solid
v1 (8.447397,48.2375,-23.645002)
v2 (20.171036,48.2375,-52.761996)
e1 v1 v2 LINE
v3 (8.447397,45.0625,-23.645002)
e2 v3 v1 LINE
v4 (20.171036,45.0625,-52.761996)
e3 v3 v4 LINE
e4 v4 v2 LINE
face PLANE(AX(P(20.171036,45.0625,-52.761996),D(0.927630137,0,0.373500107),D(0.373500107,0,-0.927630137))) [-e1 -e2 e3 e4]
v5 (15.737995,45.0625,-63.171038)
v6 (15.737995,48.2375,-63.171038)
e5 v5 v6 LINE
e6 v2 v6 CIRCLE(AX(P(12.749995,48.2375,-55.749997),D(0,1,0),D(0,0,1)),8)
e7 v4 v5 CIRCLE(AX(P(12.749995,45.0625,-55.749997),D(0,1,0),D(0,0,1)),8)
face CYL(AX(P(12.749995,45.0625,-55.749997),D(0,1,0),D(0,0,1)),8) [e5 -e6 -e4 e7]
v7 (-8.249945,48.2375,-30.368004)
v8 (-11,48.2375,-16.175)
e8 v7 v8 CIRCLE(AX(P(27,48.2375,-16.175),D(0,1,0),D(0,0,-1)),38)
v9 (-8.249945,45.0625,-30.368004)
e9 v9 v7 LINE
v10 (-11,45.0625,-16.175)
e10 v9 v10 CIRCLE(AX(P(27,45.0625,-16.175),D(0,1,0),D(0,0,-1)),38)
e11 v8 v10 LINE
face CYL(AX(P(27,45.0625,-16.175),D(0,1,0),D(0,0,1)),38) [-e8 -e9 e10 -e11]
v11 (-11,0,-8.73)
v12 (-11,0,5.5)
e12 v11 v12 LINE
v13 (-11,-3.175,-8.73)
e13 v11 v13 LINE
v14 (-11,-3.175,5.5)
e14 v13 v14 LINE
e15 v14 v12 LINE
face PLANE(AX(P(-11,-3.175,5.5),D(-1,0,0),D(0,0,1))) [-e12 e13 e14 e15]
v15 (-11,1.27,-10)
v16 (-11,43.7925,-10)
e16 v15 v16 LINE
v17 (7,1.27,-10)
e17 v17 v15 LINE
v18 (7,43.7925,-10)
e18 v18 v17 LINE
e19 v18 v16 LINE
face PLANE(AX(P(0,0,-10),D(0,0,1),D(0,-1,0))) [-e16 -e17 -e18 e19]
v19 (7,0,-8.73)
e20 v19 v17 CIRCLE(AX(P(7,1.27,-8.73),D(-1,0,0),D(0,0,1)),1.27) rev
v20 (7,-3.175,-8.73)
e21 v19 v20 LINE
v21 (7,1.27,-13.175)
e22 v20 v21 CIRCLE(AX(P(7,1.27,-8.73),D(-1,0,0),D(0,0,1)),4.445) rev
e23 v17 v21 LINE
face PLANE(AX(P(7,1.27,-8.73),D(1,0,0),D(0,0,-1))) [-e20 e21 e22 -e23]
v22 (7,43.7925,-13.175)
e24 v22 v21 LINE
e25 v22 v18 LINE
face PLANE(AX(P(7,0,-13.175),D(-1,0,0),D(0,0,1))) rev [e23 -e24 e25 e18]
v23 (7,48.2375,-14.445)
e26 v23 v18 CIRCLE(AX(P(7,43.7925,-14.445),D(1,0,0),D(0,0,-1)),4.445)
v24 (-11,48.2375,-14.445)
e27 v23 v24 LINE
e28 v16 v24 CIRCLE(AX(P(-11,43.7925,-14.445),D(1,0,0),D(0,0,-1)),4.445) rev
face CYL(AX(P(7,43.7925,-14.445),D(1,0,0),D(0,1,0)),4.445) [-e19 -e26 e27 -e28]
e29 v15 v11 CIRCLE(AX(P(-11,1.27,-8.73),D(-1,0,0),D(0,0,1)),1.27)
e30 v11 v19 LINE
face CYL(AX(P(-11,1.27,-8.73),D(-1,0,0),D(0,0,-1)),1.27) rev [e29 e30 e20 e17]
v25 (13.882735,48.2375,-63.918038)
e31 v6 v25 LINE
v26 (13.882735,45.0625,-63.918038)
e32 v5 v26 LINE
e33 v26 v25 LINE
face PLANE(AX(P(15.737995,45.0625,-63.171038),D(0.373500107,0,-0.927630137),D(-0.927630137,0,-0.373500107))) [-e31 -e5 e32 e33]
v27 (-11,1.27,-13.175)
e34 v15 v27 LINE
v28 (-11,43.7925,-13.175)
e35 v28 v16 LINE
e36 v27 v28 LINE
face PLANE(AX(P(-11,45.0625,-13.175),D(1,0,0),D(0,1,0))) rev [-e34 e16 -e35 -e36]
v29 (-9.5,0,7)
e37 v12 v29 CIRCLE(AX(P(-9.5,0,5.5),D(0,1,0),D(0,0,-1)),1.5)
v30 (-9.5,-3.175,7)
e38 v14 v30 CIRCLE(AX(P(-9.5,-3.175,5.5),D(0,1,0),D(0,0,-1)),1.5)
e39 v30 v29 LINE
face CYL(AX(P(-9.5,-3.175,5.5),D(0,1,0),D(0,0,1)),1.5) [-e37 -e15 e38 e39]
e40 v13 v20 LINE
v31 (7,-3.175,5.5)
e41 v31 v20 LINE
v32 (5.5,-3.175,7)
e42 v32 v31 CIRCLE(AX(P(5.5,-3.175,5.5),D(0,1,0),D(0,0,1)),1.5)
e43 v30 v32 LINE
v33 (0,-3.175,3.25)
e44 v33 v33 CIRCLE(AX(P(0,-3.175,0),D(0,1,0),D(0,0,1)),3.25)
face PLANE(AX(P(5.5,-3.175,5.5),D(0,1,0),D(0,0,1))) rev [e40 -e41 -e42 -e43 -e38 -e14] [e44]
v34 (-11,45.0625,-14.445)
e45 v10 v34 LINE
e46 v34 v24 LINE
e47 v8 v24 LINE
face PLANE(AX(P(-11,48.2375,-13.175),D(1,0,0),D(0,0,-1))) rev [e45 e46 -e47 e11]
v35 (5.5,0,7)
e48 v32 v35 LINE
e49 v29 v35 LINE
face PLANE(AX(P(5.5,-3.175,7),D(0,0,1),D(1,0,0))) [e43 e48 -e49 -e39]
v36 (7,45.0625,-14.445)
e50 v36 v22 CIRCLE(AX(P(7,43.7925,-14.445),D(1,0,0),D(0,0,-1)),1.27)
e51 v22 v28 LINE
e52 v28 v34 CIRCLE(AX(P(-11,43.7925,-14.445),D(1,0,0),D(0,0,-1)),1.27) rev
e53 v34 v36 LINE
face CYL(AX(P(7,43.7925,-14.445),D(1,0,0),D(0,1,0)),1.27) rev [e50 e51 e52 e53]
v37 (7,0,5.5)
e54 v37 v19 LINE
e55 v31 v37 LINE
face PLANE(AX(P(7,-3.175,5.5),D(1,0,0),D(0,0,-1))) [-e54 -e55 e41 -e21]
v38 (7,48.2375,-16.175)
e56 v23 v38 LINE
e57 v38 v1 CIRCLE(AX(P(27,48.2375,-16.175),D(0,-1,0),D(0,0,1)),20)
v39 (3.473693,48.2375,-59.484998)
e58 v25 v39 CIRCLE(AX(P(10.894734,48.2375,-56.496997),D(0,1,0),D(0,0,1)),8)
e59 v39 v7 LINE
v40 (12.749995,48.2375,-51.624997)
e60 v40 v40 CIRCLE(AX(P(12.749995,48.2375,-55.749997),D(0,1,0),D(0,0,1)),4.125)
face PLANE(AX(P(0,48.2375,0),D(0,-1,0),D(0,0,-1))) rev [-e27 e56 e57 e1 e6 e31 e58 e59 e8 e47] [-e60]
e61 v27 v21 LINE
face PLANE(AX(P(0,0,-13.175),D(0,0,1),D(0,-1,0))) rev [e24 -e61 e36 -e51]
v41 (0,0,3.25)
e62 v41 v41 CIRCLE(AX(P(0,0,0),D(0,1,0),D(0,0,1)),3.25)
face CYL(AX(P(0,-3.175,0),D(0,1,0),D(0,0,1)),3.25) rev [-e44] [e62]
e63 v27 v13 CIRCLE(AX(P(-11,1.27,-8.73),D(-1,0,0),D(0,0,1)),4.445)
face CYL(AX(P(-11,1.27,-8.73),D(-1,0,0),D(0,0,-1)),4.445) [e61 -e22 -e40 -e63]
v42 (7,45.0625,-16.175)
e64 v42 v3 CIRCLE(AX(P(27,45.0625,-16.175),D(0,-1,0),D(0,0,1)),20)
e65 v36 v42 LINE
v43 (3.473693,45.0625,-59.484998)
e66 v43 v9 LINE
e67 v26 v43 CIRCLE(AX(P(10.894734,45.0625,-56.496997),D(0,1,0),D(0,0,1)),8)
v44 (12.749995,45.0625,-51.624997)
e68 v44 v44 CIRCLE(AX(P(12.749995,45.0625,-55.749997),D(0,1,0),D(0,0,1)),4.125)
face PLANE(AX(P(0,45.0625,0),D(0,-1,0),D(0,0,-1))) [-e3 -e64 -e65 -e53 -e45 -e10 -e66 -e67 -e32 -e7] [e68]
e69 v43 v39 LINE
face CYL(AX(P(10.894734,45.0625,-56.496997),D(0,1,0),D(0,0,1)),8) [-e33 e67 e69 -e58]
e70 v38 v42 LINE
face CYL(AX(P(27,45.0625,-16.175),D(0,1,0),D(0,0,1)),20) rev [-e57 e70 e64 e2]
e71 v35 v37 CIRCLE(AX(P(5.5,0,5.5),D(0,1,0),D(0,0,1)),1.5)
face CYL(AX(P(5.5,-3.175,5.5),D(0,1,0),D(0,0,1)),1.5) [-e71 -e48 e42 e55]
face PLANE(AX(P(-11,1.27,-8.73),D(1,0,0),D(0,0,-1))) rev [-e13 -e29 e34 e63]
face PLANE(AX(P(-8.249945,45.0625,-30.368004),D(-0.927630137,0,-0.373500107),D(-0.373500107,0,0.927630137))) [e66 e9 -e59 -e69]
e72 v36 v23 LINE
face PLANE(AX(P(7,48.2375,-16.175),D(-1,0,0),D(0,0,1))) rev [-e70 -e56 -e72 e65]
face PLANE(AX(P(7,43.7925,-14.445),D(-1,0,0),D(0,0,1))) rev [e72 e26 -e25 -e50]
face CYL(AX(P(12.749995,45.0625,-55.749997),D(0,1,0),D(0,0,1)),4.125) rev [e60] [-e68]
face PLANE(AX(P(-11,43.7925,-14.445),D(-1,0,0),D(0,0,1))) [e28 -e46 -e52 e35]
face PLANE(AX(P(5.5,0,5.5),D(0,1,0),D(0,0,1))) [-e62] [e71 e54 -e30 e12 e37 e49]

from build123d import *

# Parameters (mm, degrees)
SKETCH1_R                    = 3.25
BASE_FLANGE1_DEPTH           = 3.175
EDGE_FLANGE1_STRIP_W         = 15.24
EDGE_FLANGE1_STRIP_H         = 3.175
EDGE_FLANGE1_STRIP_CUT_DEPTH = 18
EDGE_FLANGE1_DEPTH           = 18
EDGE_FLANGE2_STRIP_W         = 15.24
EDGE_FLANGE2_STRIP_H         = 3.175
EDGE_FLANGE2_STRIP_CUT_DEPTH = 18
EDGE_FLANGE2_DEPTH           = 18
SKETCH12_R                   = 4.125
BOSS_EXTRUDE1_DEPTH          = 3.175


# Sheet-metal steps are written as plain solids
with BuildPart() as part:
    # Sketch1 → Base-Flange1 (new body)
    with BuildSketch(Plane(origin=(0, 0, 0), x_dir=(1, 0, 0), z_dir=(0, 1, 0))):
        with BuildLine():
            Line((7, -5.5), (7, 10))
            Line((7, 10), (-11, 10))
            Line((-11, 10), (-11, -5.5))
            ThreePointArc((-11, -5.5), (-10.560660172, -6.560660172), (-9.5, -7))
            Line((-9.5, -7), (5.5, -7))
            ThreePointArc((5.5, -7), (6.560660172, -6.560660172), (7, -5.5))
        make_face()
        with Locations(Location((0, 0, 0), (0, 0, 270))):
            Circle(SKETCH1_R, mode=Mode.SUBTRACT)
    extrude(amount=-BASE_FLANGE1_DEPTH)

    # Edge-Flange1 strip (across the edge) → Edge-Flange1 strip cut (cut)
    with BuildSketch(Plane(origin=(7, 0, -10), x_dir=(0, 0, 1), z_dir=(-1, 0, 0))):
        with Locations((-6.35, -1.5875)):
            Rectangle(EDGE_FLANGE1_STRIP_W, EDGE_FLANGE1_STRIP_H)
    extrude(amount=EDGE_FLANGE1_STRIP_CUT_DEPTH, mode=Mode.SUBTRACT)

    # Edge-Flange1 section (across the edge) → Edge-Flange1 (add)
    with BuildSketch(Plane(origin=(7, 0, -10), x_dir=(0, 0, 1), z_dir=(-1, 0, 0))):
        with BuildLine():
            Line((-3.175, 1.27), (-3.175, 45.0625))
            Line((-3.175, 45.0625), (0, 45.0625))
            Line((0, 45.0625), (0, 1.27))
            ThreePointArc((0, 1.27), (0.371974388, 0.371974388), (1.27, 0))
            Line((1.27, 0), (1.27, -3.175))
            ThreePointArc((1.27, -3.175), (-1.873089642, -1.873089642), (-3.175, 1.27))
        make_face()
    extrude(amount=EDGE_FLANGE1_DEPTH)

    # Edge-Flange2 strip (across the edge) → Edge-Flange2 strip cut (cut)
    with BuildSketch(Plane(origin=(-11, 45.0625, -13.175), x_dir=(0, -1, 0), z_dir=(1, 0, 0))):
        with Locations((-6.35, -1.5875)):
            Rectangle(EDGE_FLANGE2_STRIP_W, EDGE_FLANGE2_STRIP_H)
    extrude(amount=EDGE_FLANGE2_STRIP_CUT_DEPTH, mode=Mode.SUBTRACT)

    # Edge-Flange2 section (across the edge) → Edge-Flange2 (add)
    with BuildSketch(Plane(origin=(-11, 45.0625, -13.175), x_dir=(0, -1, 0), z_dir=(1, 0, 0))):
        with BuildLine():
            Line((-3.175, 1.27), (-3.175, 3))
            Line((-3.175, 3), (0, 3))
            Line((0, 3), (0, 1.27))
            ThreePointArc((0, 1.27), (0.371974388, 0.371974388), (1.27, 0))
            Line((1.27, 0), (1.27, -3.175))
            ThreePointArc((1.27, -3.175), (-1.873089642, -1.873089642), (-3.175, 1.27))
        make_face()
    extrude(amount=EDGE_FLANGE2_DEPTH)

    # Sketch12 → Boss-Extrude1 (add)
    with BuildSketch(Plane(origin=(0, 48.2375, 0), x_dir=(1, 0, 0), z_dir=(0, 1, 0))):
        with BuildLine():
            Line((7, 16.175), (-11, 16.175))
            ThreePointArc((-11, 16.175), (-10.306151754, 23.403488178), (-8.249945193, 30.368004048))
            Line((-8.249945193, 30.368004048), (3.473693159, 59.484997741))
            ThreePointArc((3.473693159, 59.484997741), (7.760101436, 63.857301034), (13.882735104, 63.918037982))
            Line((13.882735104, 63.918037982), (15.737995377, 63.171037769))
            ThreePointArc((15.737995377, 63.171037769), (20.11029867, 58.884629492), (20.171035618, 52.761995824))
            Line((20.171035618, 52.761995824), (8.447397267, 23.64500213))
            ThreePointArc((8.447397267, 23.64500213), (7.365183288, 19.979467462), (7, 16.175))
        make_face()
        with Locations(Location((12.749994525, 55.749996676, 0), (0, 0, 270))):
            Circle(SKETCH12_R, mode=Mode.SUBTRACT)
    extrude(amount=-BOSS_EXTRUDE1_DEPTH)


solid = part.part
